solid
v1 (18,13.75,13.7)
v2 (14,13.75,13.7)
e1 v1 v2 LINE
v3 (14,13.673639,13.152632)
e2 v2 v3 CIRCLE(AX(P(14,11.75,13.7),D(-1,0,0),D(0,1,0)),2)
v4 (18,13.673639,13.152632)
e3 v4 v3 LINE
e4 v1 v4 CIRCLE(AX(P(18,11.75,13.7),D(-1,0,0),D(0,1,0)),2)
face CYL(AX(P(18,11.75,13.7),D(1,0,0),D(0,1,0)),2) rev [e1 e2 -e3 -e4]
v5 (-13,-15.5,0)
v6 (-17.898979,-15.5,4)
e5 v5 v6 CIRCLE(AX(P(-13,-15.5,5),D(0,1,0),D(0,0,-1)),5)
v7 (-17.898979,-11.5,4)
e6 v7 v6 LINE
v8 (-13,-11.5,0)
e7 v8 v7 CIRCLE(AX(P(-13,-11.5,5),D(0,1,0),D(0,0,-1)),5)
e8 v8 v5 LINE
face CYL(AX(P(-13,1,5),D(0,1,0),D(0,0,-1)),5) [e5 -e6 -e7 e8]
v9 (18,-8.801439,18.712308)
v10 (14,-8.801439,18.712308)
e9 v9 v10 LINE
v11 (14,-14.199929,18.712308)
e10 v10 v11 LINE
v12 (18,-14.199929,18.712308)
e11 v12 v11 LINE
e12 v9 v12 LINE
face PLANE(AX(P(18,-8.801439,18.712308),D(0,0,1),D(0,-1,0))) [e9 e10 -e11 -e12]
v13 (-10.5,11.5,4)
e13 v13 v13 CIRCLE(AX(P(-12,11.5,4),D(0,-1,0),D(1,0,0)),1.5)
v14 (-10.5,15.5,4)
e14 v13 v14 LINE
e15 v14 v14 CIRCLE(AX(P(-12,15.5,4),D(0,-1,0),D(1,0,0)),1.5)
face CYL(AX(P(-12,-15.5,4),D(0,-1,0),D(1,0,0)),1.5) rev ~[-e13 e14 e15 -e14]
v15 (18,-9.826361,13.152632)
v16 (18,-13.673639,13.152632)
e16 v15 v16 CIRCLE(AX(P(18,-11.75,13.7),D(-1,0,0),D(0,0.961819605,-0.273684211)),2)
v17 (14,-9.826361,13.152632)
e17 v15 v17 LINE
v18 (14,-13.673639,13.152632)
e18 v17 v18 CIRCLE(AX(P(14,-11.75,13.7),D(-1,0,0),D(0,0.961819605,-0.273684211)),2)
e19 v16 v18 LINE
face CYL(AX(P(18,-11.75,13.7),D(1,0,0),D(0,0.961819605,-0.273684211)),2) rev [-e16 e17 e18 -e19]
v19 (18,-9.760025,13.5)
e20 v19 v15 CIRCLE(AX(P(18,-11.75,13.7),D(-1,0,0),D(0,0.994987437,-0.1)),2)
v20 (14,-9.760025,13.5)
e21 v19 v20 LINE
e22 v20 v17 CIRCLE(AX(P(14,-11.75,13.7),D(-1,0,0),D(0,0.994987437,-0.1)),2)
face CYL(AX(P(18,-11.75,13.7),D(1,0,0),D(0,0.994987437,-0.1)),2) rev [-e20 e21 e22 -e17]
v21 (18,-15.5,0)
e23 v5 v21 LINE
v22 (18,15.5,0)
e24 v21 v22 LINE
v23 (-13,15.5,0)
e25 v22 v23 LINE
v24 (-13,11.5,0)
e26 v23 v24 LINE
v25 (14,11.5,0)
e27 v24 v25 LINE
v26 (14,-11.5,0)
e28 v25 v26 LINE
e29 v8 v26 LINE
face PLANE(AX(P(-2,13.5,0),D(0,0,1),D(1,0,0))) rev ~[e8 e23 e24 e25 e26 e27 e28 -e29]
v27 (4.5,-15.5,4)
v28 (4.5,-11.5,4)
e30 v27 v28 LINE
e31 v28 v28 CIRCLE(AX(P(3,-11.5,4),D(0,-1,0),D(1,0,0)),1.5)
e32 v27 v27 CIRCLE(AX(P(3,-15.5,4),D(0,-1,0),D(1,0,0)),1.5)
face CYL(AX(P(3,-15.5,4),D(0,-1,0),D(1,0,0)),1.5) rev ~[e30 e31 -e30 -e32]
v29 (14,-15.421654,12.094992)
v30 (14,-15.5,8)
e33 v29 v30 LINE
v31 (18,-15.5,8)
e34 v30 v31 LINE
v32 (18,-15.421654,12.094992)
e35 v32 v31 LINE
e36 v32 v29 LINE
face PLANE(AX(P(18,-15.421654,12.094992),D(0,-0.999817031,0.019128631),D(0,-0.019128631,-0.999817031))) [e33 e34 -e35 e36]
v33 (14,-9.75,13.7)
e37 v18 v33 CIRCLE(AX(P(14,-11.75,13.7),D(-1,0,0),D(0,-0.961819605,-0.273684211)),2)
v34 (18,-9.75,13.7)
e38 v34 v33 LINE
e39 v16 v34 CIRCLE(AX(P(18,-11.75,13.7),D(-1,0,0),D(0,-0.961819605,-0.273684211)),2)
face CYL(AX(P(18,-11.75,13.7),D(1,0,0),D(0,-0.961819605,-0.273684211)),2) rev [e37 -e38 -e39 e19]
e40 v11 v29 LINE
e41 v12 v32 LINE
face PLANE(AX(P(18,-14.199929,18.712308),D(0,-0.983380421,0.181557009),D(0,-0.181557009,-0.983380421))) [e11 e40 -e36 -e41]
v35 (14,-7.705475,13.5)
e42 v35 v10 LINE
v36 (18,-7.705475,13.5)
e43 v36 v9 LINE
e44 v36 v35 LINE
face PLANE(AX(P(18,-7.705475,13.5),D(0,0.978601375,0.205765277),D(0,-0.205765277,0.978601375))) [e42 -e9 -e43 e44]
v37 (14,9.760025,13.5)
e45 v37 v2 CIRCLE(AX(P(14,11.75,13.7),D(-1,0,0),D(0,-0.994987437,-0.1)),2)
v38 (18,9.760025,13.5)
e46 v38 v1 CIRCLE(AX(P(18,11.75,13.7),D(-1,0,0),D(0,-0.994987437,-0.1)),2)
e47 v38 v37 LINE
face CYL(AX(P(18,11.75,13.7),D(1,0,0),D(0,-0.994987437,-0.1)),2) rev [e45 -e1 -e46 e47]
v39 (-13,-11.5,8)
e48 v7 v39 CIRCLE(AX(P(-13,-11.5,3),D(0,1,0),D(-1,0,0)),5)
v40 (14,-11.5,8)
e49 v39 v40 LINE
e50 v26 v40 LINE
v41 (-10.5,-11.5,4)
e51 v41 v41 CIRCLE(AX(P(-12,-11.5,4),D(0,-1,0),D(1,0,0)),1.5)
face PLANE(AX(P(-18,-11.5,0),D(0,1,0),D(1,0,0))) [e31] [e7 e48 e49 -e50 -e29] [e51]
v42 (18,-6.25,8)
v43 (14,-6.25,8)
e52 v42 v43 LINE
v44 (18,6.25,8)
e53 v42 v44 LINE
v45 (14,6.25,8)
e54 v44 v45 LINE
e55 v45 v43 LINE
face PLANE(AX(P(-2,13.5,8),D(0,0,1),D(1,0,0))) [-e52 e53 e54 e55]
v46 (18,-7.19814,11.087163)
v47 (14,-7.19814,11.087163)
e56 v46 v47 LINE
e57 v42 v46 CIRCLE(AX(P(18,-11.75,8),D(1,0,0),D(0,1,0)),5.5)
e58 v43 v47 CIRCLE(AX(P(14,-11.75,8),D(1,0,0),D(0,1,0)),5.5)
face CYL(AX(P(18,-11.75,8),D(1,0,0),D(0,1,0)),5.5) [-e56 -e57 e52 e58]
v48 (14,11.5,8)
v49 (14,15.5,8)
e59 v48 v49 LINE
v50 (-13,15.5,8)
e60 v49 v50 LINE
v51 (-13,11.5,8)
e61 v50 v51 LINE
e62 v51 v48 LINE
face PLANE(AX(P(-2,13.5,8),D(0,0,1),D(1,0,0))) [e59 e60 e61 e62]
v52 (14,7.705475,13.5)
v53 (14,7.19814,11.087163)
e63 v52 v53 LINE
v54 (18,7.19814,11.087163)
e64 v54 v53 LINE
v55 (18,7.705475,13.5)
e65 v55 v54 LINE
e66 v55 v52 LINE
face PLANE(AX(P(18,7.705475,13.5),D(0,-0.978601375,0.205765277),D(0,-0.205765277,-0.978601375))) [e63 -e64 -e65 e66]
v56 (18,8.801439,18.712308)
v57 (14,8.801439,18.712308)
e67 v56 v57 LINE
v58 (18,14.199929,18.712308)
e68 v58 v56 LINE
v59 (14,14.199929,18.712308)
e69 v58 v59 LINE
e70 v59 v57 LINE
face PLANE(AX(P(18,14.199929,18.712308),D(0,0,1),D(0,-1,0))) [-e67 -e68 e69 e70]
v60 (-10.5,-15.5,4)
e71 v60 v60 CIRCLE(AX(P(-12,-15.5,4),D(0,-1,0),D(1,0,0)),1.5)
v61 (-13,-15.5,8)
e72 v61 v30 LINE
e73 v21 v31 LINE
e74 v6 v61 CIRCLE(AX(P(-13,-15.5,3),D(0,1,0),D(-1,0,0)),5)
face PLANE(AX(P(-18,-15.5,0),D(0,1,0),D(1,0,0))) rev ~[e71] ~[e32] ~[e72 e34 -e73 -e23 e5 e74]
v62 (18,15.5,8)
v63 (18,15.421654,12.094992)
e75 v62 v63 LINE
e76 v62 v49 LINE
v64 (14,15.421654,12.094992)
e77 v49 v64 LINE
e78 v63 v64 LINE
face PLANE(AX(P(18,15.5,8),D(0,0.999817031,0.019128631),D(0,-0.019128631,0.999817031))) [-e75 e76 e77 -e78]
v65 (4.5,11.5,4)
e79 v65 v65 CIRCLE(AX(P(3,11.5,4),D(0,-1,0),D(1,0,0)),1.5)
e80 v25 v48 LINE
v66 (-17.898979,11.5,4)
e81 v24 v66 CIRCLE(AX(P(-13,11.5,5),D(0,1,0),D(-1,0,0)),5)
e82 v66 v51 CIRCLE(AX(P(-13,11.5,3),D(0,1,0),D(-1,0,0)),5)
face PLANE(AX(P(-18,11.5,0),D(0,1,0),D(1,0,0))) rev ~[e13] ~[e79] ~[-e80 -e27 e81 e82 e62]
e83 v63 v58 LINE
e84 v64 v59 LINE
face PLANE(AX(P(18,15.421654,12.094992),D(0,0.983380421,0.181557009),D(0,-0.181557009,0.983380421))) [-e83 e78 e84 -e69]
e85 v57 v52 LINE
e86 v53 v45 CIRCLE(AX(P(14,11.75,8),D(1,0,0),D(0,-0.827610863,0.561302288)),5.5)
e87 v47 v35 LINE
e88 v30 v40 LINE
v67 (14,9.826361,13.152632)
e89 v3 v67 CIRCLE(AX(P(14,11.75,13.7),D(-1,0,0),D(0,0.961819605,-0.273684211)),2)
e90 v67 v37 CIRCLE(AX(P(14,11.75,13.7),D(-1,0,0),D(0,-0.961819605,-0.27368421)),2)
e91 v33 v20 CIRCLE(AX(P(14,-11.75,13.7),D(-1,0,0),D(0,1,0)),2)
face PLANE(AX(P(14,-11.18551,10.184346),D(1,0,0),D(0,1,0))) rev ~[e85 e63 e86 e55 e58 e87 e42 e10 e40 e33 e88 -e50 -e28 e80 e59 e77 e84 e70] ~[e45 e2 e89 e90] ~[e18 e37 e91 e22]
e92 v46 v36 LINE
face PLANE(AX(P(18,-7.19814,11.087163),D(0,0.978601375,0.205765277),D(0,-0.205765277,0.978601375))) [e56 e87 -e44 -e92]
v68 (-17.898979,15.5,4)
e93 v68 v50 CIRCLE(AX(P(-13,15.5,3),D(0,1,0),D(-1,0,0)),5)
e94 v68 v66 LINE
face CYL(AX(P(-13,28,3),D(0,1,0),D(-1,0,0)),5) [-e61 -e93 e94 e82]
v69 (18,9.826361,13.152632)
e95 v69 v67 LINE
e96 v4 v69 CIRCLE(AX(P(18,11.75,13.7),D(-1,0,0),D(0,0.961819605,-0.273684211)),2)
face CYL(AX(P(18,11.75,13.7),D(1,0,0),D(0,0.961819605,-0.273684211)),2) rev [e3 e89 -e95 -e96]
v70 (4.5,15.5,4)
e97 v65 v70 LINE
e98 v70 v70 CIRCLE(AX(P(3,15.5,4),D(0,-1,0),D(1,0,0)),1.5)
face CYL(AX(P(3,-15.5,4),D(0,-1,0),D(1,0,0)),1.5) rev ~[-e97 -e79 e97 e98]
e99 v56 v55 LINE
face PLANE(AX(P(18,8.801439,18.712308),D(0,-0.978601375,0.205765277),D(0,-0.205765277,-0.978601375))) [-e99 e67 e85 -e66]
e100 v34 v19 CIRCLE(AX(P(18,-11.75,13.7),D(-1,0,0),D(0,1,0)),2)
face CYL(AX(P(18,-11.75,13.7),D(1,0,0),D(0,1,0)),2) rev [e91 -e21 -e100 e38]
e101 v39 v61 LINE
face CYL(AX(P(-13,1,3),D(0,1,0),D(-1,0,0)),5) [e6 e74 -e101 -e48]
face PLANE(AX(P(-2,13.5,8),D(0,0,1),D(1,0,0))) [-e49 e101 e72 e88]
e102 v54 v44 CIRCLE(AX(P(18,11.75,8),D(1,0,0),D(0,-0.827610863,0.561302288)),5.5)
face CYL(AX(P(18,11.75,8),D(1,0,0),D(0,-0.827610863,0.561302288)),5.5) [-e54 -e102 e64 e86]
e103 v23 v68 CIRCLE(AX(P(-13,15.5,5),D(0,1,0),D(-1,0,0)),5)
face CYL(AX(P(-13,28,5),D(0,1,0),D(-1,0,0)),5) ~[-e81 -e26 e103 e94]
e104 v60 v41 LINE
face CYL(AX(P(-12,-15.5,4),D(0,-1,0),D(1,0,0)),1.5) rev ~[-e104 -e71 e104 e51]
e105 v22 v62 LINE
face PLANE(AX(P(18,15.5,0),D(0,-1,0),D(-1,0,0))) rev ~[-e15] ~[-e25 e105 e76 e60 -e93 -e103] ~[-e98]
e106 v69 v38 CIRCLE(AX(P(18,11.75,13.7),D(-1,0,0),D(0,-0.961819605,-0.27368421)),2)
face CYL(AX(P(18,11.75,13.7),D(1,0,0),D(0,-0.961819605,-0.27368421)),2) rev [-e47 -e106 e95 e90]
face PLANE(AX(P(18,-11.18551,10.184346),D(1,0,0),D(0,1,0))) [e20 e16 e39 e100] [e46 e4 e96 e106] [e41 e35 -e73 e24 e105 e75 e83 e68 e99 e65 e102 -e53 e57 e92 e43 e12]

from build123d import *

# Parameters (mm, degrees)
F0_W        = 32
F0_H        = 4
F1_DEPTH    = 8
F3_DEPTH    = 4
F4_DEPTH    = 25
F5_R        = 1.5
F6_DEPTH    = 40
F7_T1_DEPTH = 29
F7_T3_DEPTH = 29


# Not quite as in the source:
# - a fillet or chamfer that OpenCascade refuses, or shapes differently, is made with other operations: its cross-section is extruded or revolved along the edge and cut away or added


with BuildPart() as f1:
    # F0 (on Top) → F1 (new body)
    with BuildSketch(Plane.XY):
        with Locations((-2, 13.5)):
            Rectangle(F0_W, F0_H)
        Polygon((14, 11.5), (14, -11.5), (14, -15.5), (18, -15.5), (18, 0), (18, 15.5), (14, 15.5), align=None)
        with Locations((-2, -13.5)):
            Rectangle(F0_W, F0_H)
    extrude(amount=F1_DEPTH)

    # F2 (on face) → F3 (join, through all)
    with BuildSketch(Plane.YZ.offset(18)):
        with BuildLine():
            Line((-15.4216540828, 12.0949916113), (-15.5, 8))
            Line((-15.5, 8), (-6.25, 8))
            ThreePointArc((-6.25, 8), (-6.4923756022, 9.6147401314), (-7.1981402517, 11.0871625858))
            ThreePointArc((-7.1981402517, 11.0871625858), (-8.3515353126, 12.3244002785), (-9.8263607896, 13.1526315789))
            ThreePointArc((-9.8263607896, 13.1526315789), (-11.75, 11.7), (-13.6736392104, 13.1526315789))
            ThreePointArc((-13.6736392104, 13.1526315789), (-14.5971876184, 12.7056904558), (-15.4216540828, 12.0949916113))
        make_face()
        with BuildLine():
            Line((6.25, 8), (11.75, 8))
            Line((11.75, 8), (15.5, 8))
            Line((15.5, 8), (15.4216540828, 12.0949916113))
            ThreePointArc((15.4216540828, 12.0949916113), (14.5971876184, 12.7056904558), (13.6736392104, 13.1526315789))
            ThreePointArc((13.6736392104, 13.1526315789), (11.75, 11.7), (9.8263607896, 13.1526315789))
            ThreePointArc((9.8263607896, 13.1526315789), (8.3515353126, 12.3244002785), (7.1981402517, 11.0871625858))
            ThreePointArc((7.1981402517, 11.0871625858), (6.4923756022, 9.6147401314), (6.25, 8))
        make_face()
        with BuildLine():
            Line((-14.1999293119, 18.7123082578), (-15.4216540828, 12.0949916113))
            ThreePointArc((-15.4216540828, 12.0949916113), (-14.5971876184, 12.7056904558), (-13.6736392104, 13.1526315789))
            ThreePointArc((-13.6736392104, 13.1526315789), (-12.0263345611, 15.6808178135), (-9.75, 13.7))
            ThreePointArc((-9.75, 13.7), (-9.7525078538, 13.5998744499), (-9.7600251258, 13.5))
            Line((-9.7600251258, 13.5), (-7.7054746686, 13.5))
            Line((-7.7054746686, 13.5), (-8.8014388457, 18.7123082578))
            Line((-8.8014388457, 18.7123082578), (-14.1999293119, 18.7123082578))
        make_face()
        with BuildLine():
            ThreePointArc((-9.8263607896, 13.1526315789), (-8.3515353126, 12.3244002785), (-7.1981402517, 11.0871625858))
            Line((-7.1981402517, 11.0871625858), (-7.7054746686, 13.5))
            Line((-7.7054746686, 13.5), (-9.7600251258, 13.5))
            ThreePointArc((-9.7600251258, 13.5), (-9.7855000622, 13.3248467056), (-9.8263607896, 13.1526315789))
        make_face()
        with BuildLine():
            ThreePointArc((13.6736392104, 13.1526315789), (14.5971876184, 12.7056904558), (15.4216540828, 12.0949916113))
            Line((15.4216540828, 12.0949916113), (14.1999293119, 18.7123082578))
            Line((14.1999293119, 18.7123082578), (8.8014388457, 18.7123082578))
            Line((8.8014388457, 18.7123082578), (7.7054746686, 13.5))
            Line((7.7054746686, 13.5), (9.7600251258, 13.5))
            ThreePointArc((9.7600251258, 13.5), (11.6498744499, 15.6974921462), (13.75, 13.7))
            ThreePointArc((13.75, 13.7), (13.7308178135, 13.4236654389), (13.6736392104, 13.1526315789))
        make_face()
        with BuildLine():
            Line((7.7054746686, 13.5), (7.1981402517, 11.0871625858))
            ThreePointArc((7.1981402517, 11.0871625858), (8.3515353126, 12.3244002785), (9.8263607896, 13.1526315789))
            ThreePointArc((9.8263607896, 13.1526315789), (9.7855000622, 13.3248467056), (9.7600251258, 13.5))
            Line((9.7600251258, 13.5), (7.7054746686, 13.5))
        make_face()
    extrude(amount=-F3_DEPTH)

    # F2 (on face) → F4 (cut)
    with BuildSketch(Plane.YZ.offset(18)):
        with BuildLine():
            ThreePointArc((9.7600251258, 13.5), (9.7855000622, 13.3248467056), (9.8263607896, 13.1526315789))
            ThreePointArc((9.8263607896, 13.1526315789), (10.7726243517, 13.4124612555), (11.75, 13.5))
            Line((11.75, 13.5), (9.7600251258, 13.5))
        make_face()
        with BuildLine():
            ThreePointArc((11.75, 13.5), (10.7726243517, 13.4124612555), (9.8263607896, 13.1526315789))
            ThreePointArc((9.8263607896, 13.1526315789), (11.75, 11.7), (13.6736392104, 13.1526315789))
            ThreePointArc((13.6736392104, 13.1526315789), (12.7273756483, 13.4124612555), (11.75, 13.5))
        make_face()
        with BuildLine():
            ThreePointArc((11.75, 13.5), (12.7273756483, 13.4124612555), (13.6736392104, 13.1526315789))
            ThreePointArc((13.6736392104, 13.1526315789), (13.7308178135, 13.4236654389), (13.75, 13.7))
            ThreePointArc((13.75, 13.7), (11.6498744499, 15.6974921462), (9.7600251258, 13.5))
            Line((9.7600251258, 13.5), (11.75, 13.5))
        make_face()
        with BuildLine():
            ThreePointArc((-11.75, 13.5), (-12.7273756483, 13.4124612555), (-13.6736392104, 13.1526315789))
            ThreePointArc((-13.6736392104, 13.1526315789), (-11.75, 11.7), (-9.8263607896, 13.1526315789))
            ThreePointArc((-9.8263607896, 13.1526315789), (-10.7726243517, 13.4124612555), (-11.75, 13.5))
        make_face()
        with BuildLine():
            ThreePointArc((-11.75, 13.5), (-10.7726243517, 13.4124612555), (-9.8263607896, 13.1526315789))
            ThreePointArc((-9.8263607896, 13.1526315789), (-9.7855000622, 13.3248467056), (-9.7600251258, 13.5))
            Line((-9.7600251258, 13.5), (-11.75, 13.5))
        make_face()
        with BuildLine():
            ThreePointArc((-9.75, 13.7), (-12.0263345611, 15.6808178135), (-13.6736392104, 13.1526315789))
            ThreePointArc((-13.6736392104, 13.1526315789), (-12.7273756483, 13.4124612555), (-11.75, 13.5))
            Line((-11.75, 13.5), (-9.7600251258, 13.5))
            ThreePointArc((-9.7600251258, 13.5), (-9.7525078538, 13.5998744499), (-9.75, 13.7))
        make_face()
    extrude(amount=-F4_DEPTH, mode=Mode.SUBTRACT)

    # F5 (on face) → F6 (cut)
    with BuildSketch(Plane.XZ.offset(15.5)):
        with Locations((-12, 4)):
            Circle(F5_R)
        with Locations((3, 4)):
            Circle(F5_R)
    extrude(amount=-F6_DEPTH, mode=Mode.SUBTRACT)

    # F7: fillet of radius 5 on 4 edges, made by hand

    # F7_s2 → F7_t1 (cut)
    with BuildSketch(Plane.XZ.offset(-1)):
        with BuildLine():
            ThreePointArc((-18, 3), (-16.5355339059, 6.5355339059), (-13, 8))
            Line((-13, 8), (-18, 8))
            Line((-18, 8), (-18, 3))
        make_face()
        with BuildLine():
            ThreePointArc((-13, 0), (-16.5355339059, 1.4644660941), (-18, 5))
            Line((-18, 5), (-18, 0))
            Line((-18, 0), (-13, 0))
        make_face()
    extrude(amount=F7_T1_DEPTH, mode=Mode.SUBTRACT)

    # F7_s4 → F7_t3 (cut)
    with BuildSketch(Plane.XZ.offset(-28)):
        with BuildLine():
            ThreePointArc((-18, 3), (-16.5355339059, 6.5355339059), (-13, 8))
            Line((-13, 8), (-18, 8))
            Line((-18, 8), (-18, 3))
        make_face()
        with BuildLine():
            ThreePointArc((-18, 5), (-16.5355339059, 1.4644660941), (-13, 0))
            Line((-13, 0), (-18, 0))
            Line((-18, 0), (-18, 5))
        make_face()
    extrude(amount=F7_T3_DEPTH, mode=Mode.SUBTRACT)


solid = f1.part
